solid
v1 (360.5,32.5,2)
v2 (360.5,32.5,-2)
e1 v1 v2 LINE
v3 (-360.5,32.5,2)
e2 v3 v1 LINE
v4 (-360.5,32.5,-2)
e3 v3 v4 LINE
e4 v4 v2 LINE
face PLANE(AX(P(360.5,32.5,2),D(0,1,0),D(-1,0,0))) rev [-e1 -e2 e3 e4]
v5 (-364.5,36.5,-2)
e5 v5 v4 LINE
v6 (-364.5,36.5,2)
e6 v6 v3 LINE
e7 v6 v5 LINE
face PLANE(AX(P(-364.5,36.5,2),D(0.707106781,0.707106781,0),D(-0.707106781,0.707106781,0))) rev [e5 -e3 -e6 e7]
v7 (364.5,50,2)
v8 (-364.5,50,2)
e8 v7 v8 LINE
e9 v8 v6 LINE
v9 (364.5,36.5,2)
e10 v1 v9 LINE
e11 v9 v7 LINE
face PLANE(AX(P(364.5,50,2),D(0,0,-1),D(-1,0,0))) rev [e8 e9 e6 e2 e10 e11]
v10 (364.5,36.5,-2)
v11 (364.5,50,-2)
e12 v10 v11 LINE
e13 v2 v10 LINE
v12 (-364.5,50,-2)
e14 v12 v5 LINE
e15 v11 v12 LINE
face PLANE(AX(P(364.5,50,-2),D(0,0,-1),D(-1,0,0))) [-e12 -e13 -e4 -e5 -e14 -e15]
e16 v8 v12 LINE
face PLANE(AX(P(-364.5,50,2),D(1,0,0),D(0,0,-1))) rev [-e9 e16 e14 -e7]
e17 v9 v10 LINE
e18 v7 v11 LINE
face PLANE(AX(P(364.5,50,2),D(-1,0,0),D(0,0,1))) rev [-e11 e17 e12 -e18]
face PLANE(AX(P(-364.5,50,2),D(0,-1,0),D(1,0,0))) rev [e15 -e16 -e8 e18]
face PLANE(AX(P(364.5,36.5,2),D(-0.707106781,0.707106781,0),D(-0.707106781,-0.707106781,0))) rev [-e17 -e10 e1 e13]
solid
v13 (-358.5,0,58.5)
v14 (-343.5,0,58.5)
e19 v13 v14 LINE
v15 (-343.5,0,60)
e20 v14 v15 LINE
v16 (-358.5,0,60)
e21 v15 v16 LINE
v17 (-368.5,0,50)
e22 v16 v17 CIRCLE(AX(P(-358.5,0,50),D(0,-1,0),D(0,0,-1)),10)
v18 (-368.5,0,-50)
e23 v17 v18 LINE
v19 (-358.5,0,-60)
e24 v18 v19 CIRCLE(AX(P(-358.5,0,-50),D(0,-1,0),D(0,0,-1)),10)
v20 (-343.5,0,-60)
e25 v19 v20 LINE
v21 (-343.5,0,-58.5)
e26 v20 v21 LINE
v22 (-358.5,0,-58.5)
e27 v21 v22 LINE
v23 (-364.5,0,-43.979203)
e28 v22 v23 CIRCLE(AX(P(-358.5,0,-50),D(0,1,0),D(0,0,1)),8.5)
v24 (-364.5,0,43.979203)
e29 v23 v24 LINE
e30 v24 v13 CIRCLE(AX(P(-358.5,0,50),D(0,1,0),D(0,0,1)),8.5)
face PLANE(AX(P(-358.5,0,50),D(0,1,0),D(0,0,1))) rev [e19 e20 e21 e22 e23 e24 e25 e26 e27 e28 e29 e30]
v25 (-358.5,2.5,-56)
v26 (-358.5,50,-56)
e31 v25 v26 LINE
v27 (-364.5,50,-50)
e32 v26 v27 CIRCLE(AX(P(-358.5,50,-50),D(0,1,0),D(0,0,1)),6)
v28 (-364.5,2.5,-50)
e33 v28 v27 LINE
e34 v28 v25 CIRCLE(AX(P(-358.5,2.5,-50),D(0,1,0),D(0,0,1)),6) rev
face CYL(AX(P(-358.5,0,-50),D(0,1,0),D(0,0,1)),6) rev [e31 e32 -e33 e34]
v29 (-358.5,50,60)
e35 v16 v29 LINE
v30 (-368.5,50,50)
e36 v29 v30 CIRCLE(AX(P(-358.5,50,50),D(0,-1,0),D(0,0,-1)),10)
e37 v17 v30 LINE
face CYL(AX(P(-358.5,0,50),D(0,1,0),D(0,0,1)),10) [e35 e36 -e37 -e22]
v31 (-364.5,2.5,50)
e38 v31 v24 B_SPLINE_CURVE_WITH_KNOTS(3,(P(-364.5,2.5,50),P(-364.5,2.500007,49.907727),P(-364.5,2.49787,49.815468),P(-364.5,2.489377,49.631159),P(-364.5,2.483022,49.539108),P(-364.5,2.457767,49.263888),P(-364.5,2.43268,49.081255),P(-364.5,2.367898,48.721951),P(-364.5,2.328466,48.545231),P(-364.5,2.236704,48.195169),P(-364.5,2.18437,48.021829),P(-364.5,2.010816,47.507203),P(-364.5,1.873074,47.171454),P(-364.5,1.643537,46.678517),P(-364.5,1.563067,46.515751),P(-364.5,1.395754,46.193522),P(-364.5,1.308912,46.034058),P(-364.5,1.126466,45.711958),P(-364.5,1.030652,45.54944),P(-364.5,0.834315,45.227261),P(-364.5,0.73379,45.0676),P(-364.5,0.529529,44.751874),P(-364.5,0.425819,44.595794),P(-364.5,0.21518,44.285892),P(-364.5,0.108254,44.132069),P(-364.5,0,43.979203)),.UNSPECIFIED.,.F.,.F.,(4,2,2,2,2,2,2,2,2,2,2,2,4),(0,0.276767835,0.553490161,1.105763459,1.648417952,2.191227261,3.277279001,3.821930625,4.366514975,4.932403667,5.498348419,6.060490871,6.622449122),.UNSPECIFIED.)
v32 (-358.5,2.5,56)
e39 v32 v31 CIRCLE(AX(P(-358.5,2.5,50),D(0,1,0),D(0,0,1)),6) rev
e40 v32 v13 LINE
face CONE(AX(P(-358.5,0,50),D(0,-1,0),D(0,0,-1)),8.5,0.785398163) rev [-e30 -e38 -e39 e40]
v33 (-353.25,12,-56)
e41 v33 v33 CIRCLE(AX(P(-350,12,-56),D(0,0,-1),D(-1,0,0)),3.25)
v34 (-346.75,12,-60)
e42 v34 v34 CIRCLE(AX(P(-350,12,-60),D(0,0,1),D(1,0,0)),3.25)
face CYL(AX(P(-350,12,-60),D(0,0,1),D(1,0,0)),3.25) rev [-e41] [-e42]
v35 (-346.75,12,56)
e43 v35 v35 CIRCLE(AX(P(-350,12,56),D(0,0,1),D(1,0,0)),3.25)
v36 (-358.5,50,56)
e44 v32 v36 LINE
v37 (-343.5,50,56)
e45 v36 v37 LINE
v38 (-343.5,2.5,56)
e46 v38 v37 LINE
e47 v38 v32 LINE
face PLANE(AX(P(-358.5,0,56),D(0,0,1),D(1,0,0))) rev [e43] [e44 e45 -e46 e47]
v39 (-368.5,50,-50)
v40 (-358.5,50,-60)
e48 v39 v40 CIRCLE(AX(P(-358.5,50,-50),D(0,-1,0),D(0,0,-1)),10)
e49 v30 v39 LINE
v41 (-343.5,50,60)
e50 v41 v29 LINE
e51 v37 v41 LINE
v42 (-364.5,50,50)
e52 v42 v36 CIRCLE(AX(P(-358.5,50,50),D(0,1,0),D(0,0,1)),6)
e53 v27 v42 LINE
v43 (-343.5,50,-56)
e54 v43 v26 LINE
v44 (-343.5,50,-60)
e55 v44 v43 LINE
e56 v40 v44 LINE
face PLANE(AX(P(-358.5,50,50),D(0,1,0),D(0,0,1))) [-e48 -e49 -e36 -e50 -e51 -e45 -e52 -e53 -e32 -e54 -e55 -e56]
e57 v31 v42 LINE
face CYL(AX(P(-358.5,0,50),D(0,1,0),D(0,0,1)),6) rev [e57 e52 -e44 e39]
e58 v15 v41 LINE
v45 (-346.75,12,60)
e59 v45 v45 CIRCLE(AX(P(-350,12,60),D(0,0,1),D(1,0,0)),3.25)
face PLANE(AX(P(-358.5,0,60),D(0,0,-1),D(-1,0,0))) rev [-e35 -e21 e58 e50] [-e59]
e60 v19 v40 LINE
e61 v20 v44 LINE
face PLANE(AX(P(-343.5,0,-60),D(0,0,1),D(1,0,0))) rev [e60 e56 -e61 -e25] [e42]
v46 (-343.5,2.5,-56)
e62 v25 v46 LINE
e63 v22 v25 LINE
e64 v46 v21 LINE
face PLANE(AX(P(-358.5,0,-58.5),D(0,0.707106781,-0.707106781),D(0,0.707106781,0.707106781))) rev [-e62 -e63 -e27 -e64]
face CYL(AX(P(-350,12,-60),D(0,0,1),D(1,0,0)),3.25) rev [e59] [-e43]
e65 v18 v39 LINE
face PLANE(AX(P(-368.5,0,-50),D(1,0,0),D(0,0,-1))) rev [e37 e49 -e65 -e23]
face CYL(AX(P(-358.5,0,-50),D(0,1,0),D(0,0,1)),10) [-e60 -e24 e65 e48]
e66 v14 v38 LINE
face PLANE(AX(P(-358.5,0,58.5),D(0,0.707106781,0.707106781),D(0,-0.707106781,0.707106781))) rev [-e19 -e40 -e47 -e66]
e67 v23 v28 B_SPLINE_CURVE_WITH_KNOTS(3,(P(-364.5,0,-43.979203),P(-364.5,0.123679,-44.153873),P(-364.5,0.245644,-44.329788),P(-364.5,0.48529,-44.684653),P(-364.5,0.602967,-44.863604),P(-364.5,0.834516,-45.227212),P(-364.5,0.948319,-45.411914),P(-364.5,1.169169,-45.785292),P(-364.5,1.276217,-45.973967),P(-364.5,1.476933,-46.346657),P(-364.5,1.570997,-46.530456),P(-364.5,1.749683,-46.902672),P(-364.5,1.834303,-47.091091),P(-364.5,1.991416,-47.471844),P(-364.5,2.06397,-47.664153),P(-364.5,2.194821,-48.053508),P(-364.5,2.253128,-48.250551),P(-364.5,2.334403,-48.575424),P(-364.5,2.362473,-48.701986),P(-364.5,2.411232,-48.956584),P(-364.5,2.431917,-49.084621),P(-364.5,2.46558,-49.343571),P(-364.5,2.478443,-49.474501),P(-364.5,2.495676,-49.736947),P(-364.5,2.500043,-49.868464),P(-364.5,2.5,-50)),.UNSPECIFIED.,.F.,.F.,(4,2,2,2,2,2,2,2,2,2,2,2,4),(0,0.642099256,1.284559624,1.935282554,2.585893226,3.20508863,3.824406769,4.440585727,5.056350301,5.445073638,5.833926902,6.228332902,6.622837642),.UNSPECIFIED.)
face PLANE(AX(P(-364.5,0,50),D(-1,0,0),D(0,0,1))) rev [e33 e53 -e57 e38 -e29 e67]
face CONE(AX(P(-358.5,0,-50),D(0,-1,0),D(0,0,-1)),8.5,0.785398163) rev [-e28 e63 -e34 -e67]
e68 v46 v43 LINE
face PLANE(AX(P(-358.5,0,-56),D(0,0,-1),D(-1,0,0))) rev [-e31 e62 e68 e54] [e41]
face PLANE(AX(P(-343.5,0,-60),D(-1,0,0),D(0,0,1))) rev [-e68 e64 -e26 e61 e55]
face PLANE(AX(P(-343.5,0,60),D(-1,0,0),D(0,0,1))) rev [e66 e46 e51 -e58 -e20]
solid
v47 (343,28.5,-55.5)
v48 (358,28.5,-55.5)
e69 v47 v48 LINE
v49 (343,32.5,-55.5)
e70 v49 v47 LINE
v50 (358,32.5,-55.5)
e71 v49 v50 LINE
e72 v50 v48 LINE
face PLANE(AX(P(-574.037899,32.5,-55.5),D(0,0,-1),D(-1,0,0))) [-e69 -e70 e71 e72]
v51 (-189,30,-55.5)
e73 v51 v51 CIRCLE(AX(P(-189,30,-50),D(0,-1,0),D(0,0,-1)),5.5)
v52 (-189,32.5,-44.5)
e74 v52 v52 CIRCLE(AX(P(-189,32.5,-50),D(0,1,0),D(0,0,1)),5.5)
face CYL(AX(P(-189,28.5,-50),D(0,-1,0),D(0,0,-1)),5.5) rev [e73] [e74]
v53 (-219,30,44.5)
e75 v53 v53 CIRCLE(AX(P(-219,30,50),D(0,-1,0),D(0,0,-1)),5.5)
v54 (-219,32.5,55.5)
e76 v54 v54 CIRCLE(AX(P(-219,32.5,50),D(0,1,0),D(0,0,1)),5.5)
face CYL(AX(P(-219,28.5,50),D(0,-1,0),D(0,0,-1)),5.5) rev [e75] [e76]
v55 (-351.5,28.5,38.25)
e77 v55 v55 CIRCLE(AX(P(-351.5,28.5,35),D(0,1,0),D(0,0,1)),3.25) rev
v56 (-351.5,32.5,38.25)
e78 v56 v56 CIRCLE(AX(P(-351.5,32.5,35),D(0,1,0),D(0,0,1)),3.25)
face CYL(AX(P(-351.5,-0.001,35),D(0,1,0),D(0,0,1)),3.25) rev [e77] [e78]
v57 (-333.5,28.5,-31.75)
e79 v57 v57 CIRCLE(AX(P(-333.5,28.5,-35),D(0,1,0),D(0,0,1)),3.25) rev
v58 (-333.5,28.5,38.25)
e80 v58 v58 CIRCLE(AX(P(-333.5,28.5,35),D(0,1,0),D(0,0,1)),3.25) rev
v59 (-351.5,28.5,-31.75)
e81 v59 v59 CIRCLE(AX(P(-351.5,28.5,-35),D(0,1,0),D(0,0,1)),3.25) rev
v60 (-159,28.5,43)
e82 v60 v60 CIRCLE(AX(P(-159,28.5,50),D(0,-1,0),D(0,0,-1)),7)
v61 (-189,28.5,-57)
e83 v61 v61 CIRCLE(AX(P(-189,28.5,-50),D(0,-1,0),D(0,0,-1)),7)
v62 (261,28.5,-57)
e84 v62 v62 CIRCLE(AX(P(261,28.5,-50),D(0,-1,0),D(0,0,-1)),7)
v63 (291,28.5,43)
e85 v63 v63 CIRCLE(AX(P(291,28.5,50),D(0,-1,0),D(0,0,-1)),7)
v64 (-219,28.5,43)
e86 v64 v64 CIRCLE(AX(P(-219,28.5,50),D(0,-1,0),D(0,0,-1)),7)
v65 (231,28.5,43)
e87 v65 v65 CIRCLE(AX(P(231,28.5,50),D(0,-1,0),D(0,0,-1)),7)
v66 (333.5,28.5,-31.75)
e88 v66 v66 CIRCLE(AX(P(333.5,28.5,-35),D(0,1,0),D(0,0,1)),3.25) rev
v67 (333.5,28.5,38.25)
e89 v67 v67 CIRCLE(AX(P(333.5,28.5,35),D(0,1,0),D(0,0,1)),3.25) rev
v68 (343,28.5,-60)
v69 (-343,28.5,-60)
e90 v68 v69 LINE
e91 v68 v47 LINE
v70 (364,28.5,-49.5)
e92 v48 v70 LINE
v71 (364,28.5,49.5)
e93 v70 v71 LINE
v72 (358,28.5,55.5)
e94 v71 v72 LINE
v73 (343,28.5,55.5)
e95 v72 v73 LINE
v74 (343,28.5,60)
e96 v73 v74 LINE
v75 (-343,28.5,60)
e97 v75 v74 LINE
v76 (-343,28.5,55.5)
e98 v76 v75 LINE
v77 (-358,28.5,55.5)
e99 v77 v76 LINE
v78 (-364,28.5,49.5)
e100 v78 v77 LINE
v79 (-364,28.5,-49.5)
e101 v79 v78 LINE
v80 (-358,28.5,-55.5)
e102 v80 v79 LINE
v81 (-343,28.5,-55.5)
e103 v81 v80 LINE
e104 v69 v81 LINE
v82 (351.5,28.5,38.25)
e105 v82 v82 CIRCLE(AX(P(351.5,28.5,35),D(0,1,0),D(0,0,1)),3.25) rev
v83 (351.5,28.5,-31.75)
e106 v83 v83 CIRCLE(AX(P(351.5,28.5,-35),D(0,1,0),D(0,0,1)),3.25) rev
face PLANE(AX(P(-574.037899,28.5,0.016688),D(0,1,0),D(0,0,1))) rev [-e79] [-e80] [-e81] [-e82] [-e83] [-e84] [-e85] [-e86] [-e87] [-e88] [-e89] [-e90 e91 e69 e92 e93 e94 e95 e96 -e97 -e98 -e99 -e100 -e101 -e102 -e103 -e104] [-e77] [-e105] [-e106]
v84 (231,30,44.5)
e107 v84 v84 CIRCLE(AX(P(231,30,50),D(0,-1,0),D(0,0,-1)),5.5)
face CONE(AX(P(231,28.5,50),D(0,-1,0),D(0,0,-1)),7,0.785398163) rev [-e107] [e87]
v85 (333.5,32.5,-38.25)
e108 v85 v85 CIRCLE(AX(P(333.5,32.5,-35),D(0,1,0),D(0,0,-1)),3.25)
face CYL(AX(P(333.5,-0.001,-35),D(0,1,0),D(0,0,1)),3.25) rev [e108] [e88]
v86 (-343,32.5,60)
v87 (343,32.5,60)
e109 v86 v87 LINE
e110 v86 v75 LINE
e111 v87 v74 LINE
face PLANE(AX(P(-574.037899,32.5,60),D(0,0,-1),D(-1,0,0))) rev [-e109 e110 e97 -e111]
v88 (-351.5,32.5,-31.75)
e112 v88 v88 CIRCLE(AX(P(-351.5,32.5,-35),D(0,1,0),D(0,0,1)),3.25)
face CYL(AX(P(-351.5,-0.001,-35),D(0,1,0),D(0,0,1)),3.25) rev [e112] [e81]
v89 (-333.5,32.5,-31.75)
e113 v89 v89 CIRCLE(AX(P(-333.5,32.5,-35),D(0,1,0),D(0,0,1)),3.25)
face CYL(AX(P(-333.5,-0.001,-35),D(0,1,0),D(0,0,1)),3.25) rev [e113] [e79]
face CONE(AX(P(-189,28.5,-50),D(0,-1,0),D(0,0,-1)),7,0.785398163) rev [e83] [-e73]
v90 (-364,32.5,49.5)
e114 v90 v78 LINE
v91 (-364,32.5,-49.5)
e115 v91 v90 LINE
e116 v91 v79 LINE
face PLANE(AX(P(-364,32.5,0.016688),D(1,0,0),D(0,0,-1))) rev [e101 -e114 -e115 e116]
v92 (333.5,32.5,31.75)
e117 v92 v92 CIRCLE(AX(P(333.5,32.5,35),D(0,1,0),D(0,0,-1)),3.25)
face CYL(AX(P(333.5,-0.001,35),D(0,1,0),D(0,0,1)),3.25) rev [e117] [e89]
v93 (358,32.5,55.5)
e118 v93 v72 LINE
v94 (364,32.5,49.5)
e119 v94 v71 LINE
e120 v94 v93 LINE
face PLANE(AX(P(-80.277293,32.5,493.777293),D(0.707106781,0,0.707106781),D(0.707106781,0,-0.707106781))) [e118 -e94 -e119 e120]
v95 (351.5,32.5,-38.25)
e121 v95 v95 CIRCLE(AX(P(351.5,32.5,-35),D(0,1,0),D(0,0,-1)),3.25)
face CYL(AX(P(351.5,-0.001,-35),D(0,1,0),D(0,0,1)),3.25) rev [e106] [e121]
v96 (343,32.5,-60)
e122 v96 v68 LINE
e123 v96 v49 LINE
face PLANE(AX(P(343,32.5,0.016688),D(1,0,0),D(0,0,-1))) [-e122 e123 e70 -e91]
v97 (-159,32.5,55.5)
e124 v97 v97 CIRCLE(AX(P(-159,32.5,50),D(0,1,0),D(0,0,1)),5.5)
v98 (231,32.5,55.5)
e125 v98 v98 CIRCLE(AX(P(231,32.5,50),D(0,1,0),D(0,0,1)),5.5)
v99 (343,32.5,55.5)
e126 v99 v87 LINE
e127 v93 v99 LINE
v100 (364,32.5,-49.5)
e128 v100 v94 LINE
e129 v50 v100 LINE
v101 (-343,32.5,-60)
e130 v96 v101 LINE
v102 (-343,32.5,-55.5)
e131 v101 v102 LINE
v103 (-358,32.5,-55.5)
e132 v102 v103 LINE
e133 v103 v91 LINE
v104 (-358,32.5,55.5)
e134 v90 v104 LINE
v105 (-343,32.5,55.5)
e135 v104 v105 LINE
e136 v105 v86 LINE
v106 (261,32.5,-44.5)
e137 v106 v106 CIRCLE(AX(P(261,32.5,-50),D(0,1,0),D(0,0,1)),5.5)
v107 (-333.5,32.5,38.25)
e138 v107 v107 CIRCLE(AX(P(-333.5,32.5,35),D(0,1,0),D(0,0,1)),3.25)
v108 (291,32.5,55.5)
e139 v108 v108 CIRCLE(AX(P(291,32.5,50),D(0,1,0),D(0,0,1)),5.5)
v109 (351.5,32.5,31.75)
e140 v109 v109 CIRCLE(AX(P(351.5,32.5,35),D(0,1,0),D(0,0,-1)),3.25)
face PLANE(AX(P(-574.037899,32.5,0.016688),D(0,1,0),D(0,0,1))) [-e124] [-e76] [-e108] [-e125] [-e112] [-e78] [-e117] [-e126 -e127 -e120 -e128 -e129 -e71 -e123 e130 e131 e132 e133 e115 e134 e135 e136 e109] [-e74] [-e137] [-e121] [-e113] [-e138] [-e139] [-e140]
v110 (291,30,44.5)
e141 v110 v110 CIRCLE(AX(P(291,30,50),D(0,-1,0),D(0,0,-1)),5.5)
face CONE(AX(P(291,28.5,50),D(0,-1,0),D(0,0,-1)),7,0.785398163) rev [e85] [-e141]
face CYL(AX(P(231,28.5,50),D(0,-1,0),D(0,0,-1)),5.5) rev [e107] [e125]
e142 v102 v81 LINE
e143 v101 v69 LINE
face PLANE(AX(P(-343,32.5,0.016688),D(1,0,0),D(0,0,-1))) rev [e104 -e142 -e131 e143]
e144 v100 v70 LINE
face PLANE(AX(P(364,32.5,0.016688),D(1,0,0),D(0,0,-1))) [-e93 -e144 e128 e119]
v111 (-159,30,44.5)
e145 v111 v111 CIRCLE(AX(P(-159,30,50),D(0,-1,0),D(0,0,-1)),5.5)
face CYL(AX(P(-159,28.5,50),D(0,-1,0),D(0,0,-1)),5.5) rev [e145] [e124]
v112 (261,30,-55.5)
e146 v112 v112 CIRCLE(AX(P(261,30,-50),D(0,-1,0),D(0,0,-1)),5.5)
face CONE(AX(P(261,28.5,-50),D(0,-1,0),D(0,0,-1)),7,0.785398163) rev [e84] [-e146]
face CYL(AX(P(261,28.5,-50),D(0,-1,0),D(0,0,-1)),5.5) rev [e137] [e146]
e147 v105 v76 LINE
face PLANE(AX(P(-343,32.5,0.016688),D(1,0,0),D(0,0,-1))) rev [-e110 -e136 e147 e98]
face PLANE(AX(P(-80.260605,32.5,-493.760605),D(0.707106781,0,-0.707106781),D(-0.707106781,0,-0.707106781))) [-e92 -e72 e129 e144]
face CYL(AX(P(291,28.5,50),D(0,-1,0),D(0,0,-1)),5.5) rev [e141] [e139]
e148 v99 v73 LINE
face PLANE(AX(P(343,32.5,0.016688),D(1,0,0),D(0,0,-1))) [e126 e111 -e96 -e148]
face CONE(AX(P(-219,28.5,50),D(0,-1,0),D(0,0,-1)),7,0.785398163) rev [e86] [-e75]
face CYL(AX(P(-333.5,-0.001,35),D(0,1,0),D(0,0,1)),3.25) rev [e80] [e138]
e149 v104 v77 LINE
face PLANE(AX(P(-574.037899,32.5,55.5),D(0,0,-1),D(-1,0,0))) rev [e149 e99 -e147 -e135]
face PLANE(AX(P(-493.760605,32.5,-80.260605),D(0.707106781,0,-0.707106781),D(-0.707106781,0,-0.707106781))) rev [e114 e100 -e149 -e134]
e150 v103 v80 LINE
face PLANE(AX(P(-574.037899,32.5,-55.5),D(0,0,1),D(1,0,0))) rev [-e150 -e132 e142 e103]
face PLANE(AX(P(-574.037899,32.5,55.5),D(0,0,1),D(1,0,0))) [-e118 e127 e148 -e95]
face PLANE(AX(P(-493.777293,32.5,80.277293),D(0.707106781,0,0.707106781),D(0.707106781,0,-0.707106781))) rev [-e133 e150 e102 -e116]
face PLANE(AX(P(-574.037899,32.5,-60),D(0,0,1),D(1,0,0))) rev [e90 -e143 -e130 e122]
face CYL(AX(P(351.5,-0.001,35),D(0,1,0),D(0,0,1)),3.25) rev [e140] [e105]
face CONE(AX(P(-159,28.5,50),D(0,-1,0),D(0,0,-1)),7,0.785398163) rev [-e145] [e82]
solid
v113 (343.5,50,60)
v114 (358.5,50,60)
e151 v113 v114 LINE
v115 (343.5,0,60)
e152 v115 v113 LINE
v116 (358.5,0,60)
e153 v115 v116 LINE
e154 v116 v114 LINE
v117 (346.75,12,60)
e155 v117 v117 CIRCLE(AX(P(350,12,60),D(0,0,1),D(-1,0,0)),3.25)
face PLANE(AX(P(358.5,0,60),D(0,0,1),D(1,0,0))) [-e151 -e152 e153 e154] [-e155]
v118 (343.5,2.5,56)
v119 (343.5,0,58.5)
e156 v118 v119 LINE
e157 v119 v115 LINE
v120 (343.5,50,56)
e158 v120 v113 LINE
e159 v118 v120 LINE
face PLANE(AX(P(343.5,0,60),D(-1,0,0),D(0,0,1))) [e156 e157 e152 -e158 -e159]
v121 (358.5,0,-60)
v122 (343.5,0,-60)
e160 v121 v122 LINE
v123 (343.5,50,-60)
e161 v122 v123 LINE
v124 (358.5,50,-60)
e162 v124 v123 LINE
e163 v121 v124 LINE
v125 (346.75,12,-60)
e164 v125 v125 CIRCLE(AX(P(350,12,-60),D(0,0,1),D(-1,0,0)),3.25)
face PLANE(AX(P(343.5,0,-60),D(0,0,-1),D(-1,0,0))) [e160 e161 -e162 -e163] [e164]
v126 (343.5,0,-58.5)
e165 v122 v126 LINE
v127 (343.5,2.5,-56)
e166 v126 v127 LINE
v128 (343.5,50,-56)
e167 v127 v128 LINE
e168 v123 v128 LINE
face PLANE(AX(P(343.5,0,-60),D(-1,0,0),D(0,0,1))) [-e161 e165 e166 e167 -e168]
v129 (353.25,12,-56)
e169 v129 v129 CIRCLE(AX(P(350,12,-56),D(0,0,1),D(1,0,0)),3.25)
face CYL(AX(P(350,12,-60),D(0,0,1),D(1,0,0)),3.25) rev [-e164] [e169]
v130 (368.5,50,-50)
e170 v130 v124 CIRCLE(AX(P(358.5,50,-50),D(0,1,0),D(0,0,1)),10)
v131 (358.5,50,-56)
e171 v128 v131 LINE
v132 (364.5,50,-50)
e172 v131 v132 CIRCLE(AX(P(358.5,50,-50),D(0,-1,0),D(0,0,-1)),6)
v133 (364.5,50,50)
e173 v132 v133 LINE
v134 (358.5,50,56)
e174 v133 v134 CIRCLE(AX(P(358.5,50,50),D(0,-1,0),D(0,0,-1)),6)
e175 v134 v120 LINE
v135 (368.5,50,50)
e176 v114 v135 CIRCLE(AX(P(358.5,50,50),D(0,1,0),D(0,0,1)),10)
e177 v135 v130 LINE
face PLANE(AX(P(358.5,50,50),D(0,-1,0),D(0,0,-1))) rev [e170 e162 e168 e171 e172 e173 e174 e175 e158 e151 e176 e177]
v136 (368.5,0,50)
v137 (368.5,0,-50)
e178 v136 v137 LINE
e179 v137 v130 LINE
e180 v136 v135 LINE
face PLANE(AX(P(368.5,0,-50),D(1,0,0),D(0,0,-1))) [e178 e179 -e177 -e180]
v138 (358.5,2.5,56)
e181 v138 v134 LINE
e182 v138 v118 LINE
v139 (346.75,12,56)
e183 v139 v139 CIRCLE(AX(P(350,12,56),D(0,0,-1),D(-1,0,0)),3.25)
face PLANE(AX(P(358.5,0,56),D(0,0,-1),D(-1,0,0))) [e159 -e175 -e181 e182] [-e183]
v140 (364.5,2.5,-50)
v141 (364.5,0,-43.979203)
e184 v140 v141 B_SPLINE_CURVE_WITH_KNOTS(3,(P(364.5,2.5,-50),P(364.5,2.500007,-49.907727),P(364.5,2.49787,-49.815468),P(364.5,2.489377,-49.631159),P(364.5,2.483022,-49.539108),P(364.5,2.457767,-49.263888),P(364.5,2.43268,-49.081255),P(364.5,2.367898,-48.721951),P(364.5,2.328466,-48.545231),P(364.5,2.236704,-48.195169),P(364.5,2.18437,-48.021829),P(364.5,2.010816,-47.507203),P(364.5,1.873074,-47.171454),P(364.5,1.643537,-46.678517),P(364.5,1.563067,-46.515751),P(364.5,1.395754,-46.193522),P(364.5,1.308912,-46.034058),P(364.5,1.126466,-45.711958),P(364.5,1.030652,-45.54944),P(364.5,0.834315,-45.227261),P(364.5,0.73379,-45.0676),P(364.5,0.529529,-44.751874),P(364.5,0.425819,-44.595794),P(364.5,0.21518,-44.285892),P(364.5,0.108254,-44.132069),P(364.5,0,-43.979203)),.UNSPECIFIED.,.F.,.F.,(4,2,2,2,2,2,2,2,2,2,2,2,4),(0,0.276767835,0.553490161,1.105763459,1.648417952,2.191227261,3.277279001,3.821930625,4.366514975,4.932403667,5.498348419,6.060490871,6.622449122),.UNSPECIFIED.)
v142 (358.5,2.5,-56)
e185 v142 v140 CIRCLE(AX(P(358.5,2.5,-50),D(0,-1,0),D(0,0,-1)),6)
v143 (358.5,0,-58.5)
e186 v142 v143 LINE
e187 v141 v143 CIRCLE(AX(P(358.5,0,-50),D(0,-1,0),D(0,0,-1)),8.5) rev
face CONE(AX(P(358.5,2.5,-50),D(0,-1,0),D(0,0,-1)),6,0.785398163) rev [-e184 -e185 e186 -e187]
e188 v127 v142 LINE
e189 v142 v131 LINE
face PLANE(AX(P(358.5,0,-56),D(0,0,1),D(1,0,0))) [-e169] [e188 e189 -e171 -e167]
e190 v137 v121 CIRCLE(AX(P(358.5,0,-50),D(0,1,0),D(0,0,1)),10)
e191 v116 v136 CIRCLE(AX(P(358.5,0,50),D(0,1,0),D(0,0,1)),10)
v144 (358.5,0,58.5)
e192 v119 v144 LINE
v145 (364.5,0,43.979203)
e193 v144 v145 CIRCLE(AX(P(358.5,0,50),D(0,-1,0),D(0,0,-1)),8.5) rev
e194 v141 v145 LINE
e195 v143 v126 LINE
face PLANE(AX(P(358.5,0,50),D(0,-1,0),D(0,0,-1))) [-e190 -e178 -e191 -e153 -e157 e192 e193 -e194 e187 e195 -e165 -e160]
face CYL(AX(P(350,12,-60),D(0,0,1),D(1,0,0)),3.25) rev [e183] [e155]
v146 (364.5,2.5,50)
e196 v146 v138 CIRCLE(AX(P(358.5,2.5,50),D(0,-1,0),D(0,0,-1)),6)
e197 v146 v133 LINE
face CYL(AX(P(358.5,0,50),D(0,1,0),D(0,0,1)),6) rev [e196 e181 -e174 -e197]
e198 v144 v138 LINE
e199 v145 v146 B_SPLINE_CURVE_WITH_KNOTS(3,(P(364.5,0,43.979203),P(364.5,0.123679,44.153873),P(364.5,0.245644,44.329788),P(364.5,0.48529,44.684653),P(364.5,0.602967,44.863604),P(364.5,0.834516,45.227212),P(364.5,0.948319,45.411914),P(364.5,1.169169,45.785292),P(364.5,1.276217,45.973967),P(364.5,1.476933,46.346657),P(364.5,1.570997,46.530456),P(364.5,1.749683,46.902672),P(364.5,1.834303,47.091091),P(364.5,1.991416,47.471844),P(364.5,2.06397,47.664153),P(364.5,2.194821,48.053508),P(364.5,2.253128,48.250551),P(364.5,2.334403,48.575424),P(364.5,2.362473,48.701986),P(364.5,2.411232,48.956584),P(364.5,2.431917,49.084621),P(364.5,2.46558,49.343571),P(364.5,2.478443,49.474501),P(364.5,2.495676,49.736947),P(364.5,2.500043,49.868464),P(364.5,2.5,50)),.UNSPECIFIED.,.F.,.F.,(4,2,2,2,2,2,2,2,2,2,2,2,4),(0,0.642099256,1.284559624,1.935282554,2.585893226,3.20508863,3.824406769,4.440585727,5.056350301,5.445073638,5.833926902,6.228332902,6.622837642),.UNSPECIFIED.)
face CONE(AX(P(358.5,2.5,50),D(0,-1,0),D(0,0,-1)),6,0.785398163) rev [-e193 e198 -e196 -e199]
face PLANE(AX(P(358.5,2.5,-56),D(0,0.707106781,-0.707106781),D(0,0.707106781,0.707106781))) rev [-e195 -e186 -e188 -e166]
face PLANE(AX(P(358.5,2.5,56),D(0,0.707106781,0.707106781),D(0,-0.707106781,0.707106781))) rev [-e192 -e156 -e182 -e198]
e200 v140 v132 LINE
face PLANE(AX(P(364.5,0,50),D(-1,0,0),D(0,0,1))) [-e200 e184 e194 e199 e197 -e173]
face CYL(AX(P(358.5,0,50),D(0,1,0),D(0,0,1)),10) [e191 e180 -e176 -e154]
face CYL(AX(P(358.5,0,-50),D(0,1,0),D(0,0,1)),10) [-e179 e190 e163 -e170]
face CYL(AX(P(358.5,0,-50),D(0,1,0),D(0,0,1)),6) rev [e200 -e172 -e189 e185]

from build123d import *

# Parameters (mm, degrees)
MEMBER_1_DEPTH                   = 50
MEMBER_2_DEPTH                   = 50
EXTRUDE_START                    = 28.5
EXTRUDE_1_DEPTH                  = 4
EXTRUDE_2_DEPTH                  = 2
HOLE_WIZARD_11_0_11_1_AT_2_COUNT = 2
HOLE_WIZARD_11_0_11_1_AT_2_PITCH = 60
HOLE_WIZARD_11_0_11_1_AT_3_COUNT = 2
HOLE_WIZARD_11_0_11_1_AT_3_PITCH = 104.403065089
HOLE_WIZARD_11_0_11_1_AT_4_COUNT = 2
HOLE_WIZARD_11_0_11_1_AT_4_PITCH = 450
HOLE_WIZARD_11_0_11_1_AT_5_COUNT = 2
HOLE_WIZARD_11_0_11_1_AT_5_PITCH = 490.306026885
HOLE_WIZARD_11_0_11_1_AT_6_COUNT = 2
HOLE_WIZARD_11_0_11_1_AT_6_PITCH = 510
SKETCH_9_R                       = 3.25
CUT_EXTRUDE_3_DEPTH              = 391.758557168
SKETCH_10_R                      = 3.25
CUT_EXTRUDE_4_DEPTH              = 4
CHAMFER_1_SIZE                   = 2.5
CHAMFER_2_SIZE                   = 2.5


# Read off the part's stored shape, not the designer's step: Конструкция1, Конструкция2
with BuildPart() as part:
    # Member 1 outline → Member 1 (new body)
    with BuildSketch(Plane(origin=(0, 0, 0), x_dir=(1, 0, 0), z_dir=(0, 1, 0))):
        with BuildLine():
            ThreePointArc((-358.5, -56), (-362.742640687, -54.242640687), (-364.5, -50))
            Line((-364.5, -50), (-364.5, 50))
            ThreePointArc((-364.5, 50), (-362.742640687, 54.242640687), (-358.5, 56))
            Line((-358.5, 56), (-343.5, 56))
            Line((-343.5, 56), (-343.5, 60))
            Line((-343.5, 60), (-358.5, 60))
            ThreePointArc((-358.5, 60), (-365.571067812, 57.071067812), (-368.5, 50))
            Line((-368.5, 50), (-368.5, -50))
            ThreePointArc((-368.5, -50), (-365.571067812, -57.071067812), (-358.5, -60))
            Line((-358.5, -60), (-343.5, -60))
            Line((-343.5, -60), (-343.5, -56))
            Line((-343.5, -56), (-358.5, -56))
        make_face()
    extrude(amount=MEMBER_1_DEPTH)


with BuildPart() as body_2:
    # Member 2 outline → Member 2 (new body)
    with BuildSketch(Plane(origin=(0, 0, 0), x_dir=(1, 0, 0), z_dir=(0, 1, 0))):
        with BuildLine():
            ThreePointArc((364.5, -50), (362.742640687, -54.242640687), (358.5, -56))
            Line((358.5, -56), (343.5, -56))
            Line((343.5, -56), (343.5, -60))
            Line((343.5, -60), (358.5, -60))
            ThreePointArc((358.5, -60), (365.571067812, -57.071067812), (368.5, -50))
            Line((368.5, -50), (368.5, 50))
            ThreePointArc((368.5, 50), (365.571067812, 57.071067812), (358.5, 60))
            Line((358.5, 60), (343.5, 60))
            Line((343.5, 60), (343.5, 56))
            Line((343.5, 56), (358.5, 56))
            ThreePointArc((358.5, 56), (362.742640687, 54.242640687), (364.5, 50))
            Line((364.5, 50), (364.5, -50))
        make_face()
    extrude(amount=MEMBER_2_DEPTH)


with BuildPart() as body_3:
    # Эскиз5 → Вытянуть1 (new body)
    with BuildSketch(Plane(origin=(0, 0, 0), x_dir=(1, 0, 0), z_dir=(0, 1, 0)).offset(EXTRUDE_START)):
        Polygon((-343, -55.5), (-343, -60), (-46.097722286, -60), (46.097722286, -60), (343, -60), (343, -55.5), (358, -55.5), (364, -49.5), (364, 49.5), (358, 55.5), (343, 55.5), (343, 60), (-343, 60), (-343, 55.5), (-358, 55.5), (-364, 49.5), (-364, -49.5), (-358, -55.5), align=None)
    extrude(amount=EXTRUDE_1_DEPTH)

    # Эскиз8 → Диаметр отверстия Ø11.0 (11)1 (revolve, cut)
    with BuildSketch(Plane(origin=(-219, 28.5, 50), x_dir=(0, 0, -1), z_dir=(1, 0, 0))):
        Polygon((0, 0), (0, 21.5), (5.5, 21.5), (5.5, 1.5), (7, 0), align=None)
    hole_wizard_11_0_11_1 = revolve(axis=Axis((-219, 22.15, 50), (0, 1, 0)), mode=Mode.SUBTRACT)

    # Диаметр отверстия Ø11.0 (11)1 at 2: Диаметр отверстия Ø11.0 (11)1 ×2
    with Locations(*[(i * HOLE_WIZARD_11_0_11_1_AT_2_PITCH, 0, 0) for i in range(1, HOLE_WIZARD_11_0_11_1_AT_2_COUNT)]):
        add(hole_wizard_11_0_11_1, mode=Mode.SUBTRACT)

    # Диаметр отверстия Ø11.0 (11)1 at 3: Диаметр отверстия Ø11.0 (11)1 ×2
    with Locations(*[Vector(0.28734788556634566, 0, -0.9578262852211513) * (i * HOLE_WIZARD_11_0_11_1_AT_3_PITCH) for i in range(1, HOLE_WIZARD_11_0_11_1_AT_3_COUNT)]):
        add(hole_wizard_11_0_11_1, mode=Mode.SUBTRACT)

    # Диаметр отверстия Ø11.0 (11)1 at 4: Диаметр отверстия Ø11.0 (11)1 ×2
    with Locations(*[(i * HOLE_WIZARD_11_0_11_1_AT_4_PITCH, 0, 0) for i in range(1, HOLE_WIZARD_11_0_11_1_AT_4_COUNT)]):
        add(hole_wizard_11_0_11_1, mode=Mode.SUBTRACT)

    # Диаметр отверстия Ø11.0 (11)1 at 5: Диаметр отверстия Ø11.0 (11)1 ×2
    with Locations(*[Vector(0.9789804197376051, 0, -0.20395425411200097) * (i * HOLE_WIZARD_11_0_11_1_AT_5_PITCH) for i in range(1, HOLE_WIZARD_11_0_11_1_AT_5_COUNT)]):
        add(hole_wizard_11_0_11_1, mode=Mode.SUBTRACT)

    # Диаметр отверстия Ø11.0 (11)1 at 6: Диаметр отверстия Ø11.0 (11)1 ×2
    with Locations(*[(i * HOLE_WIZARD_11_0_11_1_AT_6_PITCH, 0, 0) for i in range(1, HOLE_WIZARD_11_0_11_1_AT_6_COUNT)]):
        add(hole_wizard_11_0_11_1, mode=Mode.SUBTRACT)

    # Эскиз10 → Вытянуть4 (cut)
    with BuildSketch(Plane(origin=(0, 32.5, 0), x_dir=(1, 0, 0), z_dir=(0, 1, 0))):
        with Locations(Location((-351.5, -35, 0), (0, 0, 270))):
            Circle(SKETCH_10_R)
        with Locations(Location((-333.5, -35, 0), (0, 0, 270))):
            Circle(SKETCH_10_R)
        with Locations(Location((-351.5, 35, 0), (0, 0, 270))):
            Circle(SKETCH_10_R)
        with Locations(Location((-333.5, 35, 0), (0, 0, 270))):
            Circle(SKETCH_10_R)
        with Locations(Location((333.5, 35, 0), (0, 0, 270))):
            Circle(SKETCH_10_R)
        with Locations(Location((351.5, 35, 0), (0, 0, 270))):
            Circle(SKETCH_10_R)
        with Locations(Location((333.5, -35, 0), (0, 0, 270))):
            Circle(SKETCH_10_R)
        with Locations(Location((351.5, -35, 0), (0, 0, 270))):
            Circle(SKETCH_10_R)
    extrude(amount=-CUT_EXTRUDE_4_DEPTH, mode=Mode.SUBTRACT)


with BuildPart() as body_4:
    # Эскиз6 → Вытянуть2 (new, symmetric)
    with BuildSketch(Plane.XY):
        Polygon((364.5, 50), (364.5, 36.5), (360.5, 32.5), (-360.5, 32.5), (-364.5, 36.5), (-364.5, 50), align=None)
    extrude(amount=EXTRUDE_2_DEPTH, both=True)


with BuildPart() as cut_extrude_3_tool:
    # Эскиз9 → Вытянуть3 (new, through all)
    with BuildSketch(Plane.XY.offset(60)):
        with Locations((-350, 12)):
            Circle(SKETCH_9_R)
        with Locations(Location((350, 12, 0), (0, 0, 180))):
            Circle(SKETCH_9_R)
    extrude(amount=-CUT_EXTRUDE_3_DEPTH)


with BuildPart() as part_1:
    add(part.part)

    # Вытянуть3: cut by cut_extrude_3_tool
    add(cut_extrude_3_tool.part, mode=Mode.SUBTRACT)

    # Фаска1
    # the kernel refuses this chamfer: 2.5 mm, written as the material it takes off along each edge
    with BuildSketch(Plane(origin=(-358.5, 0, -56), x_dir=(0, -0.027495876610586334, -0.9996219169112968), z_dir=(1, 0, 0))) as chamfer_1_piece_1:
        Polygon((CHAMFER_1_SIZE * 0.999621916911, CHAMFER_1_SIZE * 0.0274958766106), (-CHAMFER_1_SIZE * 0.0274958766106, CHAMFER_1_SIZE * 0.999621916911), (0, 0), align=None)
    extrude(amount=21.42920747, mode=Mode.SUBTRACT)
    with BuildSketch(Plane(origin=(-358.5, 0, -50), x_dir=(-0.478399584580855, 0, 0.8781422649393805), z_dir=(0.8781422649393805, 0, 0.478399584580855))) as chamfer_1_piece_2:
        Polygon((6 + CHAMFER_1_SIZE, 0), (6, -CHAMFER_1_SIZE), (6, 0), align=None)
    revolve(axis=Axis((-358.5, 0, -50), (0, -1, 0)), revolution_arc=151.419071563, mode=Mode.SUBTRACT)
    with BuildSketch(Plane(origin=(-358.5, 0, 50), x_dir=(-6.788051601834064e-11, 0, 1.0), z_dir=(1.0, 0, 6.788051601834064e-11))) as chamfer_1_piece_3:
        Polygon((6, -CHAMFER_1_SIZE), (6 + CHAMFER_1_SIZE, 0), (6, 0), align=None)
    revolve(axis=Axis((-358.5, 0, 50), (0, -1, 0)), revolution_arc=151.419071563, mode=Mode.SUBTRACT)
    with BuildSketch(Plane(origin=(-337.07079253, 0, 56), x_dir=(0, 0.9996219169112968, -0.0274958766105877), z_dir=(-1, 0, 0))) as chamfer_1_piece_4:
        Polygon((CHAMFER_1_SIZE * 0.999621916911, -CHAMFER_1_SIZE * 0.0274958766106), (-CHAMFER_1_SIZE * 0.0274958766106, -CHAMFER_1_SIZE * 0.999621916911), (0, 0), align=None)
    extrude(amount=21.42920747, mode=Mode.SUBTRACT)


with BuildPart() as body_2_1:
    add(body_2.part)

    # Вытянуть3: cut by cut_extrude_3_tool
    add(cut_extrude_3_tool.part, mode=Mode.SUBTRACT)

    # Фаска2
    # the kernel refuses this chamfer: 2.5 mm, written as the material it takes off along each edge
    with BuildSketch(Plane(origin=(337.07079253, 0, -56), x_dir=(0, -0.027495876610586334, -0.9996219169112968), z_dir=(1, 0, 0))) as chamfer_2_piece_1:
        Polygon((CHAMFER_2_SIZE * 0.999621916911, CHAMFER_2_SIZE * 0.0274958766106), (-CHAMFER_2_SIZE * 0.0274958766106, CHAMFER_2_SIZE * 0.999621916911), (0, 0), align=None)
    extrude(amount=21.42920747, mode=Mode.SUBTRACT)
    with BuildSketch(Plane(origin=(358.5, 0, -50), x_dir=(6.788051601834064e-11, 0, -1.0), z_dir=(-1.0, 0, -6.788051601834064e-11))) as chamfer_2_piece_2:
        Polygon((6 + CHAMFER_2_SIZE, 0), (6, -CHAMFER_2_SIZE), (6, 0), align=None)
    revolve(axis=Axis((358.5, 0, -50), (0, -1, 0)), revolution_arc=151.419071563, mode=Mode.SUBTRACT)
    with BuildSketch(Plane(origin=(358.5, 0, 50), x_dir=(0.478399584580855, 0, -0.8781422649393805), z_dir=(-0.8781422649393805, 0, -0.478399584580855))) as chamfer_2_piece_3:
        Polygon((6, -CHAMFER_2_SIZE), (6 + CHAMFER_2_SIZE, 0), (6, 0), align=None)
    revolve(axis=Axis((358.5, 0, 50), (0, -1, 0)), revolution_arc=151.419071563, mode=Mode.SUBTRACT)
    with BuildSketch(Plane(origin=(358.5, 0, 56), x_dir=(0, 0.9996219169112968, -0.0274958766105877), z_dir=(-1, 0, 0))) as chamfer_2_piece_4:
        Polygon((CHAMFER_2_SIZE * 0.999621916911, -CHAMFER_2_SIZE * 0.0274958766106), (-CHAMFER_2_SIZE * 0.0274958766106, -CHAMFER_2_SIZE * 0.999621916911), (0, 0), align=None)
    extrude(amount=21.42920747, mode=Mode.SUBTRACT)


solid = Compound([body_3.part, body_4.part, part_1.part, body_2_1.part])
